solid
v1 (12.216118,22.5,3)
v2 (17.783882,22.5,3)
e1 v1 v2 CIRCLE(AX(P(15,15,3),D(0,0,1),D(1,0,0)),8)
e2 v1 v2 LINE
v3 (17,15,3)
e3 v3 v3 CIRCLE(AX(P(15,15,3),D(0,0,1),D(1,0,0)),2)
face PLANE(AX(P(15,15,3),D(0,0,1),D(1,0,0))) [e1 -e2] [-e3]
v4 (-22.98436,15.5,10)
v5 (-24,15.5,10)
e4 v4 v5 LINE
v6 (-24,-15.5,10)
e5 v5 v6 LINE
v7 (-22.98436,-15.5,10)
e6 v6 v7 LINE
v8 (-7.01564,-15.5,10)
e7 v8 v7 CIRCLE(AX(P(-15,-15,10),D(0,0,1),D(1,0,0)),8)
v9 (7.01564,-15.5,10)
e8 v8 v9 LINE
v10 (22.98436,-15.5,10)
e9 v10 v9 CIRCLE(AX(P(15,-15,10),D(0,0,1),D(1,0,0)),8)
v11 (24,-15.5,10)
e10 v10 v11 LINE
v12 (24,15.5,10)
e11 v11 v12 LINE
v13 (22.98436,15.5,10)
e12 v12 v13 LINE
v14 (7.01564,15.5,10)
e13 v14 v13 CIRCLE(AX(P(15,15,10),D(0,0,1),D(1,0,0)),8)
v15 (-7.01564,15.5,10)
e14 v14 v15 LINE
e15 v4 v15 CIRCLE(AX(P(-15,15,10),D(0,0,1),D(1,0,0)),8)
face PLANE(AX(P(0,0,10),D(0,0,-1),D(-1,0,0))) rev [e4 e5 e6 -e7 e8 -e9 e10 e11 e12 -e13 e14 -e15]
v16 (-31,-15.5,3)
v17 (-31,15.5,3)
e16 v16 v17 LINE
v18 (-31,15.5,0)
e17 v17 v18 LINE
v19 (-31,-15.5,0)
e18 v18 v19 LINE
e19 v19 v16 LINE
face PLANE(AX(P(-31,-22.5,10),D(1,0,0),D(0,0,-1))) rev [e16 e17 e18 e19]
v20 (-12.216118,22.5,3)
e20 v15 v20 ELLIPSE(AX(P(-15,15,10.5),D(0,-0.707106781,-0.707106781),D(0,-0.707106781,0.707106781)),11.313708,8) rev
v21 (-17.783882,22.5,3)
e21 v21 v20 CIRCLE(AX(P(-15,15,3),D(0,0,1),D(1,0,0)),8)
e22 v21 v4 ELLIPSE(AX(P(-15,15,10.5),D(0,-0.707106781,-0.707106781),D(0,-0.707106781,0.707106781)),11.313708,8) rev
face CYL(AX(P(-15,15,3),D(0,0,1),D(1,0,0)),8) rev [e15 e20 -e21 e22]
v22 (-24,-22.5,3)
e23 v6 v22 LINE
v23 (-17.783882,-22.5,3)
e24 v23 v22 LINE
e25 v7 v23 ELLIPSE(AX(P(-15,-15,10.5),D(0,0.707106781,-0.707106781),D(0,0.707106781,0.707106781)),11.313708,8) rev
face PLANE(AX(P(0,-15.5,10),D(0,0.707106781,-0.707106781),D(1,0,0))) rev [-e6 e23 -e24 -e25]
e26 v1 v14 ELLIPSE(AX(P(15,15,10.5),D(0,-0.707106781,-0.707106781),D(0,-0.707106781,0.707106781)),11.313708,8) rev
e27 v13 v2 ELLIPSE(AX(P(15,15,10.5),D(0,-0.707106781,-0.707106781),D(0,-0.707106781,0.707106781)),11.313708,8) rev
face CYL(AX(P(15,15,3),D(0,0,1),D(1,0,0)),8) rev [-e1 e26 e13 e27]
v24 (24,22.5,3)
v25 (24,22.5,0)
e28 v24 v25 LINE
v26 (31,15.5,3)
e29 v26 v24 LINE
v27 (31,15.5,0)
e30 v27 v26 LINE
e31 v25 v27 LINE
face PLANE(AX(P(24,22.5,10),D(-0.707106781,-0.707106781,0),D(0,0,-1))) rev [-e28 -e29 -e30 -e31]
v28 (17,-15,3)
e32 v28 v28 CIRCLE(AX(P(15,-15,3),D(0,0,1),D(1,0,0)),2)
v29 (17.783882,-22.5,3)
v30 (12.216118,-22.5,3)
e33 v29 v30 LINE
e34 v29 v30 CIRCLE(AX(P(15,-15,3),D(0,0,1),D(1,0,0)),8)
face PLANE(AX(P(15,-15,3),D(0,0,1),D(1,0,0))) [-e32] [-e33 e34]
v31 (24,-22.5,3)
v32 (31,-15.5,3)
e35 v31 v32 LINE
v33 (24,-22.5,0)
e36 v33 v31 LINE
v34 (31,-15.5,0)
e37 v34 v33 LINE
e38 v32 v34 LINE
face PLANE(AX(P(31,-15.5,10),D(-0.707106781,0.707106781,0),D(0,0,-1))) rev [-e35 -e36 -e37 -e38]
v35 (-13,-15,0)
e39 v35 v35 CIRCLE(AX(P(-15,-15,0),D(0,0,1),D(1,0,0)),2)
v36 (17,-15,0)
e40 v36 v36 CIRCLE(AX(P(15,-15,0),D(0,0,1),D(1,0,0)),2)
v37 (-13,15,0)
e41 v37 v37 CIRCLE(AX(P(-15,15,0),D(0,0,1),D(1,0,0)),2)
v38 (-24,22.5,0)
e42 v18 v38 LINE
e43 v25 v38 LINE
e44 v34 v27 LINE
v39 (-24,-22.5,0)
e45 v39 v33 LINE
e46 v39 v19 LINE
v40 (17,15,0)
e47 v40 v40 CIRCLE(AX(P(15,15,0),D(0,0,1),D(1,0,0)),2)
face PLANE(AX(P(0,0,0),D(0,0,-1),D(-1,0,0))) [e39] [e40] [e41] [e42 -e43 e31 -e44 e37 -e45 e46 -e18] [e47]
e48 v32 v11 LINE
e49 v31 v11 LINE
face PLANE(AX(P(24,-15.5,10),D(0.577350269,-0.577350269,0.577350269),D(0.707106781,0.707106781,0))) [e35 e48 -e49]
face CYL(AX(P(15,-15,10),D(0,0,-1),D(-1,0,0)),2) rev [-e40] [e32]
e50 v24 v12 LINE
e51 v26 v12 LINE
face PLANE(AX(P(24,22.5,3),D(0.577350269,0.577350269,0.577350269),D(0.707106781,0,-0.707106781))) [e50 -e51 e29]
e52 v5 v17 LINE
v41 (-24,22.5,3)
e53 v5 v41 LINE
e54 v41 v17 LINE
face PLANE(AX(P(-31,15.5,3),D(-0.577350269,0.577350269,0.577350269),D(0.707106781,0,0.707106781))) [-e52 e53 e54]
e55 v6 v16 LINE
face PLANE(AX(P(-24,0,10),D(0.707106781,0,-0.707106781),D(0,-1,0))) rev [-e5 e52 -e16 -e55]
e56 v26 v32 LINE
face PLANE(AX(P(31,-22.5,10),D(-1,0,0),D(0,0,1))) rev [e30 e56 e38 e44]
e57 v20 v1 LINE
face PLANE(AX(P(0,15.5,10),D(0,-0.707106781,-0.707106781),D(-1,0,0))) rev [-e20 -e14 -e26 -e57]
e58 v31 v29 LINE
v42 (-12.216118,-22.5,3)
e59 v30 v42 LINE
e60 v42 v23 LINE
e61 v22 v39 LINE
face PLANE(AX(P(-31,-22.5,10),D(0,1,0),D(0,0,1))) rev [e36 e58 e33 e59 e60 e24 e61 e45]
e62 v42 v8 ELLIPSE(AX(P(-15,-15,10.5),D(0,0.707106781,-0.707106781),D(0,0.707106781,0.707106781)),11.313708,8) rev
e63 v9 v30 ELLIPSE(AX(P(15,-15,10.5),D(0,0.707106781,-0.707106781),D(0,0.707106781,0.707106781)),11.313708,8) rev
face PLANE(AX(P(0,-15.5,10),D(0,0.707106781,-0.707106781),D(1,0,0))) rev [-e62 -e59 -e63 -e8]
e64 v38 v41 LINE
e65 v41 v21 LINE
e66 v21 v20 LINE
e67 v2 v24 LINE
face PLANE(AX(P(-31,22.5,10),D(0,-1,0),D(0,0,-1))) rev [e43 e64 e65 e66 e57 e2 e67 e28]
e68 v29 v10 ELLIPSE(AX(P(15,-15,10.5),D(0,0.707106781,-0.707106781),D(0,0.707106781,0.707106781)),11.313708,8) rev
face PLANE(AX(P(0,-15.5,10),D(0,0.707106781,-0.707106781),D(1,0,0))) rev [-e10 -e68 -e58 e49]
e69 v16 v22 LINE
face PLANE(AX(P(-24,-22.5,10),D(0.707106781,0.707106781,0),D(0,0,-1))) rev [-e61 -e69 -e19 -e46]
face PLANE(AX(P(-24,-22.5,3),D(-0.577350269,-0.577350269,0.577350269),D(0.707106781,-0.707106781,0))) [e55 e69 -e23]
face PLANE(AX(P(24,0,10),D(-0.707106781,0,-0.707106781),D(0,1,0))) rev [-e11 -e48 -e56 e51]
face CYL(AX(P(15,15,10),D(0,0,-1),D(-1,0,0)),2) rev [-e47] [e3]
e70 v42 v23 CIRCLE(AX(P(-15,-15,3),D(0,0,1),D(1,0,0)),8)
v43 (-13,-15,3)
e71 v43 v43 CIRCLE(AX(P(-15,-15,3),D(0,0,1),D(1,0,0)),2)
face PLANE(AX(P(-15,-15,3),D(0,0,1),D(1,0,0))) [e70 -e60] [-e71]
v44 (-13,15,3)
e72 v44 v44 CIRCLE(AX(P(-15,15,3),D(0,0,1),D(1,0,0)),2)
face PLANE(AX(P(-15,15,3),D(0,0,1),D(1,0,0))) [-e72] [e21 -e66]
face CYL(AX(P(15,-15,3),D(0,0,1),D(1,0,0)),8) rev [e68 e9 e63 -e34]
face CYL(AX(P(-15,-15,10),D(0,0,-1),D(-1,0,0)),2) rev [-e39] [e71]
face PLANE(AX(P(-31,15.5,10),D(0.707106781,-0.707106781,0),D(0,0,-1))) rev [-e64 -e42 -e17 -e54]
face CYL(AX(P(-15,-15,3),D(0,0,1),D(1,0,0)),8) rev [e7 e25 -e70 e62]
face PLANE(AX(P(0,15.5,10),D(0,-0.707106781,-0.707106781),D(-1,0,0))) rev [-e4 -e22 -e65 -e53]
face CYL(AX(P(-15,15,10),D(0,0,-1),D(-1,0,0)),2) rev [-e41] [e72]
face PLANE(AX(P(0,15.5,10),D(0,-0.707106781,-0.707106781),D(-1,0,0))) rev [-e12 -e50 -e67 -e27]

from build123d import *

# Parameters (mm, degrees)
SKETCH1_W           = 62
SKETCH1_H           = 45
SKETCH1_R           = 2
BOSS_EXTRUDE1_DEPTH = 10
SKETCH2_R           = 8
CUT_EXTRUDE1_DEPTH  = 7


with BuildPart() as part:
    # Sketch1 → Boss-Extrude1 (new body)
    with BuildSketch(Plane.XY):
        Rectangle(SKETCH1_W, SKETCH1_H)
        with Locations((-15, -15)):
            Circle(SKETCH1_R, mode=Mode.SUBTRACT)
        with Locations((-15, 15)):
            Circle(SKETCH1_R, mode=Mode.SUBTRACT)
        with Locations((15, 15)):
            Circle(SKETCH1_R, mode=Mode.SUBTRACT)
        with Locations((15, -15)):
            Circle(SKETCH1_R, mode=Mode.SUBTRACT)
    extrude(amount=BOSS_EXTRUDE1_DEPTH)

    # Chamfer1
    # the kernel refuses this chamfer: 7 mm, written as the material it takes off along each edge
    with BuildSketch(Plane(origin=(-26.333333333, 17.833333333, 5.333333333), x_dir=(0, 0.7071067811865476, -0.7071067811865476), z_dir=(-0.5773502691896257, 0.5773502691896257, 0.5773502691896257)), Plane(origin=(-26.333333333, -17.833333333, 5.333333333), x_dir=(0, 0.7071067811865476, 0.7071067811865476), z_dir=(-0.5773502691896257, -0.5773502691896257, 0.5773502691896257)), Plane(origin=(26.333333333, 17.833333333, 5.333333333), x_dir=(-0.7071067811865476, 0.7071067811865476, 0), z_dir=(0.5773502691896257, 0.5773502691896257, 0.5773502691896257))) as chamfer1_piece_1:
        Polygon((-4.949747468, -2.857738033), (4.949747468, -2.857738033), (0, 5.715476066), align=None)
    extrude(amount=8.891194146, mode=Mode.SUBTRACT)
    with BuildSketch(Plane(origin=(26.333333333, -17.833333333, 5.333333333), x_dir=(0, 0.7071067811865476, 0.7071067811865476), z_dir=(0.5773502691896257, -0.5773502691896257, 0.5773502691896257))) as chamfer1_piece_2:
        Polygon((-4.949747468, 2.857738033), (4.949747468, 2.857738033), (0, -5.715476066), align=None)
    extrude(amount=8.891194146, mode=Mode.SUBTRACT)
    with BuildSketch(Plane(origin=(-31, 40.501780916, 10), x_dir=(-0.02749587661058661, 0, -0.9996219169112968), z_dir=(0, -1, 0)), Plane(origin=(31, -40.501780916, 10), x_dir=(0.02749587661058661, 0, -0.9996219169112968), z_dir=(0, 1, 0))) as chamfer1_piece_3:
        with BuildLine():
            Line((7.200712366, 0), (-0.395830084, 7.189824555))
            Line((-0.395830084, 7.189824555), (-0.535777153, 7.185975132))
            ThreePointArc((-0.535777153, 7.185975132), (-0.238904589, 3.593784808), (-0.139947068, -0.003849423))
            Line((-0.139947068, -0.003849423), (0.003849423, -0.139947068))
            ThreePointArc((0.003849423, -0.139947068), (3.601483653, -0.040989547), (7.204561789, -0.139947068))
            Line((7.204561789, -0.139947068), (7.200712366, 0))
        make_face()
    extrude(amount=81.003561832, mode=Mode.SUBTRACT)
    with BuildSketch(Plane(origin=(-49.001780916, -22.5, 10), x_dir=(0, -0.02749587661058661, -0.9996219169112968), z_dir=(1, 0, 0)), Plane(origin=(49.001780916, 22.5, 10), x_dir=(0, 0.02749587661058661, -0.9996219169112968), z_dir=(-1, 0, 0))) as chamfer1_piece_4:
        with BuildLine():
            Line((7.200712366, 0), (-0.395830084, 7.189824555))
            Line((-0.395830084, 7.189824555), (-0.535777153, 7.185975132))
            ThreePointArc((-0.535777153, 7.185975132), (-0.238904589, 3.593784808), (-0.139947068, -0.003849423))
            Line((-0.139947068, -0.003849423), (0.003849423, -0.139947068))
            ThreePointArc((0.003849423, -0.139947068), (3.601483653, -0.040989547), (7.204561789, -0.139947068))
            Line((7.204561789, -0.139947068), (7.200712366, 0))
        make_face()
    extrude(amount=98.003561832, mode=Mode.SUBTRACT)
    with BuildSketch(Plane(origin=(31, -22.5, -18.001780916), x_dir=(-0.9996219169112968, -0.027495876610586605, 0), z_dir=(0, 0, 1)), Plane(origin=(-31, 22.5, -18.001780916), x_dir=(0.9996219169112968, 0.027495876610586605, 0), z_dir=(0, 0, 1)), Plane(origin=(31, 22.5, -18.001780916), x_dir=(0.02749587661058661, -0.9996219169112968, 0), z_dir=(0, 0, 1))) as chamfer1_piece_5:
        with BuildLine():
            Line((7.200712366, 0), (-0.395830084, -7.189824555))
            Line((-0.395830084, -7.189824555), (-0.535777153, -7.185975132))
            ThreePointArc((-0.535777153, -7.185975132), (-0.238904589, -3.593784808), (-0.139947068, 0.003849423))
            Line((-0.139947068, 0.003849423), (0.003849423, 0.139947068))
            ThreePointArc((0.003849423, 0.139947068), (3.601483653, 0.040989547), (7.204561789, 0.139947068))
            Line((7.204561789, 0.139947068), (7.200712366, 0))
        make_face()
    extrude(amount=46.003561832, mode=Mode.SUBTRACT)
    with BuildSketch(Plane(origin=(-31, -22.5, -18.001780916), x_dir=(0.9996219169112968, -0.027495876610586605, 0), z_dir=(0, 0, 1))) as chamfer1_piece_6:
        with BuildLine():
            Line((7.200712366, 0), (-0.395830084, 7.189824555))
            Line((-0.395830084, 7.189824555), (-0.535777153, 7.185975132))
            ThreePointArc((-0.535777153, 7.185975132), (-0.238904589, 3.593784808), (-0.139947068, -0.003849423))
            Line((-0.139947068, -0.003849423), (0.003849423, -0.139947068))
            ThreePointArc((0.003849423, -0.139947068), (3.601483653, -0.040989547), (7.204561789, -0.139947068))
            Line((7.204561789, -0.139947068), (7.200712366, 0))
        make_face()
    extrude(amount=46.003561832, mode=Mode.SUBTRACT)

    # Sketch2 → Cut-Extrude1 (cut)
    with BuildSketch(Plane.XY.offset(10)):
        with Locations((-15, 15)):
            Circle(SKETCH2_R)
        with Locations((-15, -15)):
            Circle(SKETCH2_R)
        with Locations((15, -15)):
            Circle(SKETCH2_R)
        with Locations((15, 15)):
            Circle(SKETCH2_R)
    extrude(amount=-CUT_EXTRUDE1_DEPTH, mode=Mode.SUBTRACT)


solid = part.part
